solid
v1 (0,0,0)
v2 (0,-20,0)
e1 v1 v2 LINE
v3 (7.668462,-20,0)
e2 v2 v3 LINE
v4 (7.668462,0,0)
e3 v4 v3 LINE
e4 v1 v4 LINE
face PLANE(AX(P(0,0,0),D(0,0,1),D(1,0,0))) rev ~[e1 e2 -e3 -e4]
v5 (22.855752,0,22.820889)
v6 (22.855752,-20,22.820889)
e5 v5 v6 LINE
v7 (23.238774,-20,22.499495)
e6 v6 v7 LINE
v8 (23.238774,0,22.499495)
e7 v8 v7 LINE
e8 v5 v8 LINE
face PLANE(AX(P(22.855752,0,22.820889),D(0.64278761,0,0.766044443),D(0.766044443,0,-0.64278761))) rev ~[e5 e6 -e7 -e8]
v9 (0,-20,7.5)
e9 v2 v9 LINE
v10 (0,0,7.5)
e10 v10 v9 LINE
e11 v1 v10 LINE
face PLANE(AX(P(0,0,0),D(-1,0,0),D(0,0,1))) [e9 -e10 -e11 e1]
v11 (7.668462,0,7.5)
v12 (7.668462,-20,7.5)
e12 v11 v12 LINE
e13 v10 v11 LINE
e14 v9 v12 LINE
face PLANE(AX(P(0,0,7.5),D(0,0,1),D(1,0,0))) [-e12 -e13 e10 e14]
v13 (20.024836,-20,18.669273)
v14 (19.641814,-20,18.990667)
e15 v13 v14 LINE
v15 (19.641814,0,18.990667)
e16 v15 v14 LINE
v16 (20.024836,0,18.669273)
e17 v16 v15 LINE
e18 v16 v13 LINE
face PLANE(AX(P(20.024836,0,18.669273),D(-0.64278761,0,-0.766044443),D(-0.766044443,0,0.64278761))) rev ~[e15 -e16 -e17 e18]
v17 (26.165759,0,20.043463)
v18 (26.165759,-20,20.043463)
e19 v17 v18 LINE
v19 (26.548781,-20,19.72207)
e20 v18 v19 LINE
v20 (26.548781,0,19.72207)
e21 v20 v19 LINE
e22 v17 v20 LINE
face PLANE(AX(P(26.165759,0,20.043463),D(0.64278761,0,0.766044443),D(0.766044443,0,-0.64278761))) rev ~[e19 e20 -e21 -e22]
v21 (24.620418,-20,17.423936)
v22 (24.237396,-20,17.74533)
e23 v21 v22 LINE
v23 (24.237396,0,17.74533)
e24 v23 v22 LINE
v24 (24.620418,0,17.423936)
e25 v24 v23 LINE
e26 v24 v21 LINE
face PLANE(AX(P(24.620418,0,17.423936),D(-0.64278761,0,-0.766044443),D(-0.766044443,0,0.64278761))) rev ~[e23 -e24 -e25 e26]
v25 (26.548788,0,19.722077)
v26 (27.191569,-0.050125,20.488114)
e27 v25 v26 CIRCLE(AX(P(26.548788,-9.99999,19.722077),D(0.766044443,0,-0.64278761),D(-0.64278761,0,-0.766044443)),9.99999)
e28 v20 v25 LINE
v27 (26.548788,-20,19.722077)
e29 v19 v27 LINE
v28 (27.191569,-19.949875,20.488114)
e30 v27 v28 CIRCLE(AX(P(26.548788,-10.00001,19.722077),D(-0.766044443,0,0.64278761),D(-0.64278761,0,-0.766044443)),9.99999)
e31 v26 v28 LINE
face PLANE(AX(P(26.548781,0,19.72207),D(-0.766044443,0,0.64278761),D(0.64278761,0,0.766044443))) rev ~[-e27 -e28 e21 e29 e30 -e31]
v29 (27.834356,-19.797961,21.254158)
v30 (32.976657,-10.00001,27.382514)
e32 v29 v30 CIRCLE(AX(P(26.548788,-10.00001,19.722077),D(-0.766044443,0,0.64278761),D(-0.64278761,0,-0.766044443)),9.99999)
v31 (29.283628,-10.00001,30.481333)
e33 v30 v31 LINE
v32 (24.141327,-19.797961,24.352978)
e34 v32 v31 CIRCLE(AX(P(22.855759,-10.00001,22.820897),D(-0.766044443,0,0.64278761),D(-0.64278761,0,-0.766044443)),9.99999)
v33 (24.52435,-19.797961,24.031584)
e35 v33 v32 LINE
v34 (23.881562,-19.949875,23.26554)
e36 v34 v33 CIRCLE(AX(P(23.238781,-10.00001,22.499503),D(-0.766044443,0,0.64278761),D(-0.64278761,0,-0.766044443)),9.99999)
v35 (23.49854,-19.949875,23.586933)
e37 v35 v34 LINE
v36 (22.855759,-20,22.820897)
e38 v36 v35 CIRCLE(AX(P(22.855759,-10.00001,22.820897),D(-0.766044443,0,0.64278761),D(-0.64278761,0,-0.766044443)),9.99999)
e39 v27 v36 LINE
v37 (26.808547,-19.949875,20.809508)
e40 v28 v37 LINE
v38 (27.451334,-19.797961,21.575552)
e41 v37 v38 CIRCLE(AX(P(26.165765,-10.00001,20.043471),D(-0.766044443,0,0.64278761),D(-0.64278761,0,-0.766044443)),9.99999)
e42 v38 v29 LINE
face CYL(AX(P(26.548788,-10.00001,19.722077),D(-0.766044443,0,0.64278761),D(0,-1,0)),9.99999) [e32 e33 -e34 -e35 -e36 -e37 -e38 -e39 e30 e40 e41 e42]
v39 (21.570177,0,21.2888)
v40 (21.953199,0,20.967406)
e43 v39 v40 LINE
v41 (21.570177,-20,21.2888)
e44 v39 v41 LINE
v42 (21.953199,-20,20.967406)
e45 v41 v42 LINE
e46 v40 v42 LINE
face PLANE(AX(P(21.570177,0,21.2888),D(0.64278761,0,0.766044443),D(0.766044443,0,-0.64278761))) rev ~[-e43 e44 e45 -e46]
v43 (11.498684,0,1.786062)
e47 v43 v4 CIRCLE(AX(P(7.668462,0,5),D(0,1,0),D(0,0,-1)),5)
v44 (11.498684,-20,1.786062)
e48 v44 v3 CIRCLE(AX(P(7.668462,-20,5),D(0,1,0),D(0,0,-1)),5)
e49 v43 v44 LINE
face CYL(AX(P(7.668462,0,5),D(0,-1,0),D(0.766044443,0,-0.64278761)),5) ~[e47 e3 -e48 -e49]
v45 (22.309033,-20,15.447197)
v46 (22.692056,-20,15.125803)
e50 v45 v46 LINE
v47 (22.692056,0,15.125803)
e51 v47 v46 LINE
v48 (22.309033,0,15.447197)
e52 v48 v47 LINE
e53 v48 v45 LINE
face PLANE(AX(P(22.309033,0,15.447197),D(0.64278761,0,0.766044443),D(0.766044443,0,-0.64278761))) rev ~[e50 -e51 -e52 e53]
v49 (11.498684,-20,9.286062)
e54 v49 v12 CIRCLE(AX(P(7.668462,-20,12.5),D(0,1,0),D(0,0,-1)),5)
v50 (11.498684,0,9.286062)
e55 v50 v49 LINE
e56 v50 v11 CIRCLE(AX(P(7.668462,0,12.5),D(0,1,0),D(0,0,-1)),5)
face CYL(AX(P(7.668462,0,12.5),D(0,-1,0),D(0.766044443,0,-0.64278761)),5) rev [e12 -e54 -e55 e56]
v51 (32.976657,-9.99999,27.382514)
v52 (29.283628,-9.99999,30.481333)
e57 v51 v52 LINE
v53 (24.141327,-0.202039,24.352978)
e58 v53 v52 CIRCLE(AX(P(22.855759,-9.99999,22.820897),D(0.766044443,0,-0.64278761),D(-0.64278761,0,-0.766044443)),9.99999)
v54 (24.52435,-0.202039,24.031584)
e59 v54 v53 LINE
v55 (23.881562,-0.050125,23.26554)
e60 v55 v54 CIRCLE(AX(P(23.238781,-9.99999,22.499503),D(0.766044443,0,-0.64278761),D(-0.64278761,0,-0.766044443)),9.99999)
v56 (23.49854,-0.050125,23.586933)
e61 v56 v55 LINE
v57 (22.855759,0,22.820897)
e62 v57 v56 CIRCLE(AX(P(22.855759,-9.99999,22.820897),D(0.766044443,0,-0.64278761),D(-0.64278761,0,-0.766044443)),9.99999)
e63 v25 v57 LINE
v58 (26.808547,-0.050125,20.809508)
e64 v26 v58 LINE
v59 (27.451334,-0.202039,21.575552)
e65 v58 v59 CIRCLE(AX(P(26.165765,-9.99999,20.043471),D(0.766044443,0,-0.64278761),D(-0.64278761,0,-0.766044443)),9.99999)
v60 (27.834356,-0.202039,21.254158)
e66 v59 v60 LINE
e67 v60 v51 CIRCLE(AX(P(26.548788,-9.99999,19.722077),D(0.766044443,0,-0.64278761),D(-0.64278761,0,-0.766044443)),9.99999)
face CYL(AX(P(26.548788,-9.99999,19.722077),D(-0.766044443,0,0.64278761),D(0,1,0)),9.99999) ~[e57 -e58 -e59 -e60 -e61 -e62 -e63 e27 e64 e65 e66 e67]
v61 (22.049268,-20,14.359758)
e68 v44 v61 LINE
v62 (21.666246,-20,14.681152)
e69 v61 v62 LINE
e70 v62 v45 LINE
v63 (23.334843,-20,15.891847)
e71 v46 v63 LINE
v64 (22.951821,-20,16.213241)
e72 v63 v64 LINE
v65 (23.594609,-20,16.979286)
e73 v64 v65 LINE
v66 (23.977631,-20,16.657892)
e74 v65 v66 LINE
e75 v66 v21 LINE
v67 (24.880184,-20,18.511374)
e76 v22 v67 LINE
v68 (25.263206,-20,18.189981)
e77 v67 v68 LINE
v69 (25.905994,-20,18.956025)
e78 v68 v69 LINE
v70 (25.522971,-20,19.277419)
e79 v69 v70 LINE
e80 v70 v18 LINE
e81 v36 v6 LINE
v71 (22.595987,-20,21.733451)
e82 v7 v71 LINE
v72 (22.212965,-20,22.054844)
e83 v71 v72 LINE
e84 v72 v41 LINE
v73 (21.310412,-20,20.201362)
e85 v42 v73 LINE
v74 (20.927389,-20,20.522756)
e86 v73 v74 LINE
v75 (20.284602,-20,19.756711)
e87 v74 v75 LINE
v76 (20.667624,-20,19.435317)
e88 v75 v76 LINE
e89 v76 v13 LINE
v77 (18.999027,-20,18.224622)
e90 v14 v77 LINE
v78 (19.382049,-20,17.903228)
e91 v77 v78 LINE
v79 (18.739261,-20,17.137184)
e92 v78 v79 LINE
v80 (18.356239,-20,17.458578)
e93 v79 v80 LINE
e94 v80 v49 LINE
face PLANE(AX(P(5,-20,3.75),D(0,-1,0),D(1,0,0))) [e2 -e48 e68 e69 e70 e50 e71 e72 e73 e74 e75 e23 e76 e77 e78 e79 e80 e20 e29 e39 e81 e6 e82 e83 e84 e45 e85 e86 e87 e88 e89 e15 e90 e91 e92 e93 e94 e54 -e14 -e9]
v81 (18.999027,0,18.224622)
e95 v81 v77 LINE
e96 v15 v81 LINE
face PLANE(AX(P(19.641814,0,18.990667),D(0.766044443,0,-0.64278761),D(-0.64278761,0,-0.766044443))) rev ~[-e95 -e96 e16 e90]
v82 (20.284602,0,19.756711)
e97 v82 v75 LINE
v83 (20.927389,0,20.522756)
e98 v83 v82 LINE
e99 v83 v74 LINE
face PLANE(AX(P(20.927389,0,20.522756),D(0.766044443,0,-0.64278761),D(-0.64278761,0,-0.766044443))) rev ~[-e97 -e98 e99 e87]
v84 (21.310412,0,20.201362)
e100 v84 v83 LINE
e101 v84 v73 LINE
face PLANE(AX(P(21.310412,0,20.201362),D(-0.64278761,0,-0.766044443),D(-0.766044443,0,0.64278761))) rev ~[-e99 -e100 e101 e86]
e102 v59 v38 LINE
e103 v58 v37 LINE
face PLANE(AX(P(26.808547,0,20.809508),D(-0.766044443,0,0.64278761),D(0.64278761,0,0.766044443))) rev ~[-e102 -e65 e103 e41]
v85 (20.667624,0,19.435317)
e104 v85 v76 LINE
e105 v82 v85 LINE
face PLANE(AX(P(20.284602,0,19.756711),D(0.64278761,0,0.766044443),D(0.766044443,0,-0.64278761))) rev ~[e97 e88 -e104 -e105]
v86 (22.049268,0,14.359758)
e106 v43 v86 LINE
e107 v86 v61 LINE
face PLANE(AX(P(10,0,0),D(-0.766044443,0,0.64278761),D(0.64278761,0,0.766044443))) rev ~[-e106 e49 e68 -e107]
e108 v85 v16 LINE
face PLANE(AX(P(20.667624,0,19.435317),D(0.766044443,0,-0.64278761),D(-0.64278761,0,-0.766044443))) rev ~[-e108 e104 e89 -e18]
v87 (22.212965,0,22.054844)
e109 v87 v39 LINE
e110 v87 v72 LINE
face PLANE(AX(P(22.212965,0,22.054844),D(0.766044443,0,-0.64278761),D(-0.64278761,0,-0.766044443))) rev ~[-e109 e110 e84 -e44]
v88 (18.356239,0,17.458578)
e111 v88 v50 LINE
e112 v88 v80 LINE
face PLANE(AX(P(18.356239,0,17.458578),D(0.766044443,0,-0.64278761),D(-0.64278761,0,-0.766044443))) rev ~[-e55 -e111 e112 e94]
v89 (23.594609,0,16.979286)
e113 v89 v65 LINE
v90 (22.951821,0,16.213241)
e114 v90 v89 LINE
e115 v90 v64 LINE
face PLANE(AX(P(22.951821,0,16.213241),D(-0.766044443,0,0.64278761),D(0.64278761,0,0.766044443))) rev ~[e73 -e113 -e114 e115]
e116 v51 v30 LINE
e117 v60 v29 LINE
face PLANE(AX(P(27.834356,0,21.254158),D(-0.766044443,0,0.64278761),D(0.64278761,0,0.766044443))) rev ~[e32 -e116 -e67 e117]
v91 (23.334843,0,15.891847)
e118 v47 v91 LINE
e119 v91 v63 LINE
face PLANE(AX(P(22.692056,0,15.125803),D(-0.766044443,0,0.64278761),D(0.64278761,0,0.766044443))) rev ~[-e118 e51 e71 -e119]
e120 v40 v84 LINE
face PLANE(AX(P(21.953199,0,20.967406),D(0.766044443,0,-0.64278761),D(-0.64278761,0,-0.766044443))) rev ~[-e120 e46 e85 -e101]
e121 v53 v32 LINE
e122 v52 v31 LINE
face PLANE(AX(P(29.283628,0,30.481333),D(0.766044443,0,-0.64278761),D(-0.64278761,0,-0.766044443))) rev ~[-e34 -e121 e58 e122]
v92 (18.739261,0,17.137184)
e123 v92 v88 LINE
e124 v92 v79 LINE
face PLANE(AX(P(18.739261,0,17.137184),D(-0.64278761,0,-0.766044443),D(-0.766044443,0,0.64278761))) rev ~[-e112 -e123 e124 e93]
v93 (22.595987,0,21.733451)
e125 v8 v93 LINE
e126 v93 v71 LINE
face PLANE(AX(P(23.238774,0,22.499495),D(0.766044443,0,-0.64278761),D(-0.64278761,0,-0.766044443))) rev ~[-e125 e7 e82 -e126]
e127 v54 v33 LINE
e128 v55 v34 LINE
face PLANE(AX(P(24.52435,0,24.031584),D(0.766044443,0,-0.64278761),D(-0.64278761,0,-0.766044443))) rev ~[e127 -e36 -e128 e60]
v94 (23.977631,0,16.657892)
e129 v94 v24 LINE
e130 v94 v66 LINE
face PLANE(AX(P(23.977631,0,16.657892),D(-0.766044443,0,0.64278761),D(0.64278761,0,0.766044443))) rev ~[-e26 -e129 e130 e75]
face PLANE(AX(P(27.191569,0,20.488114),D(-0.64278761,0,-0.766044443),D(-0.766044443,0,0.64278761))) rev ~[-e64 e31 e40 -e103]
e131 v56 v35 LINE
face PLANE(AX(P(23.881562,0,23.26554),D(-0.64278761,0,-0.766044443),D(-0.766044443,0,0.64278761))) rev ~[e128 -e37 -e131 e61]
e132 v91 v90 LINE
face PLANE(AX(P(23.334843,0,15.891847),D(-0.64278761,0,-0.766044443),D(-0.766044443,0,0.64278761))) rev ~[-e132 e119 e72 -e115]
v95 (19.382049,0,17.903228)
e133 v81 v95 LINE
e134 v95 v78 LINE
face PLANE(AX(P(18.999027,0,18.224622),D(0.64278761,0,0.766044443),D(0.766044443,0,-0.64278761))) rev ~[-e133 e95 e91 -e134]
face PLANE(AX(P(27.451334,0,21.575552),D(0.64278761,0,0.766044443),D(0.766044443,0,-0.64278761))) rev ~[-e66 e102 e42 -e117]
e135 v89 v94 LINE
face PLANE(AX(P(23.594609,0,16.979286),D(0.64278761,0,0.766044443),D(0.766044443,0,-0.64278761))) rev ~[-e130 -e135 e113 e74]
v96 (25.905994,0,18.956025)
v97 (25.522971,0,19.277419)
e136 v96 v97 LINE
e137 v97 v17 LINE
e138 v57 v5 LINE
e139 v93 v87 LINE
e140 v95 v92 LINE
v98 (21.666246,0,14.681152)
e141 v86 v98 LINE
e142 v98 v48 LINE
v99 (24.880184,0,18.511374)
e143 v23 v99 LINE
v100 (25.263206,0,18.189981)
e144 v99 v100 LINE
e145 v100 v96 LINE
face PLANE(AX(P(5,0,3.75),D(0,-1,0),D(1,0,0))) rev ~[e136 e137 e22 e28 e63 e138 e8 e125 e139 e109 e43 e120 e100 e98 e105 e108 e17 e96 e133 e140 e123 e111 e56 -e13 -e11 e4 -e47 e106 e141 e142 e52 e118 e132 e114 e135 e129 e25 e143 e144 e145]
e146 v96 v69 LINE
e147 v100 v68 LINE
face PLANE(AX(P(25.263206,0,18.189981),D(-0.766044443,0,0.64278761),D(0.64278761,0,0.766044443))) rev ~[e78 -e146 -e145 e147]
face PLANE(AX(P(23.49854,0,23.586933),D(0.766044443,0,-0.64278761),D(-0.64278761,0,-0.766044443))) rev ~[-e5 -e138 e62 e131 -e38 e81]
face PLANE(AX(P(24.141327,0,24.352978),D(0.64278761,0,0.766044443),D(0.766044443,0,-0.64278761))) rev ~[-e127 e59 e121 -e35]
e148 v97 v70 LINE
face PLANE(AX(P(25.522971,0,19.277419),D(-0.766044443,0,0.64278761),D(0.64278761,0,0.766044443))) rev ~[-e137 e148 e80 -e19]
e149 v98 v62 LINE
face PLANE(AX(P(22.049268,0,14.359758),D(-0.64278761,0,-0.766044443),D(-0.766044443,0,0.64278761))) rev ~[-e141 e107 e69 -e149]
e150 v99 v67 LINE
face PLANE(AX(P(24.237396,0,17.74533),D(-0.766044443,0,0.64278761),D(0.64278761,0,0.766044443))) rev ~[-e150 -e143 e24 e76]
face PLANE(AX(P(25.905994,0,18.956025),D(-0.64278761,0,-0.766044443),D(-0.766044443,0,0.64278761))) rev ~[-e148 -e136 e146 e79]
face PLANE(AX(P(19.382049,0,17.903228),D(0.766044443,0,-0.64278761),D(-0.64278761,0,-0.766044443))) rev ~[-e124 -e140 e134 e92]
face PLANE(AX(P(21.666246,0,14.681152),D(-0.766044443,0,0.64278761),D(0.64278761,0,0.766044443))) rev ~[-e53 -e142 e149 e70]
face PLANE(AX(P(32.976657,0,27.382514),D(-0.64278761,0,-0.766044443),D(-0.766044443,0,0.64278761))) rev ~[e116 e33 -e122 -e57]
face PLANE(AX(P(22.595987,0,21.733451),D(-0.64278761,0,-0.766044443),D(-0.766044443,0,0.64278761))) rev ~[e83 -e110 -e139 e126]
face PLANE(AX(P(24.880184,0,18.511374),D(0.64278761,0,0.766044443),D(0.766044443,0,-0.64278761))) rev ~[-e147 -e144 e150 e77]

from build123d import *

# Parameters (mm, degrees)
F0_W     = 10
F0_H     = 7.5
F1_DEPTH = 20
F2_R     = 5
F3_R     = 9.99999
F4_R     = 5


# Not quite as in the source:
# - a fillet or chamfer is up to 0.001 mm smaller than in the source, because OpenCascade refuses the exact size


with BuildPart() as f1:
    # F0 (on Front) → F1 (new body)
    with BuildSketch(Plane.XZ):
        with Locations((5, 3.75)):
            Rectangle(F0_W, F0_H)
        Polygon((10, 7.5), (10, 0), (22.0492679997, 14.3597584268), (21.6662457782, 14.6811522316), (22.3090333878, 15.4471966748), (22.6920556094, 15.1258028699), (23.3348432191, 15.891847313), (22.9518209975, 16.2132411179), (23.5946086072, 16.979285561), (23.9776308288, 16.6578917562), (24.6204184385, 17.4239361993), (24.2373962169, 17.7453300041), (24.8801838266, 18.5113744472), (25.2632060482, 18.1899806424), (25.9059936578, 18.9560250855), (25.5229714363, 19.2774188904), (26.165759046, 20.0434633335), (26.5487812675, 19.7220695286), (27.1915688772, 20.4881139717), (26.8085466557, 20.8095077766), (27.4513342653, 21.5755522197), (27.8343564869, 21.2541584149), (32.9766573644, 27.3825139598), (29.2836282906, 30.4813332936), (24.1413274131, 24.3529777486), (24.5243496347, 24.0315839438), (23.881562025, 23.2655395007), (23.4985398034, 23.5869333055), (22.8557521937, 22.8208888624), (23.2387744153, 22.4994950575), (22.5959868056, 21.7334506144), (22.212964584, 22.0548444193), (21.5701769744, 21.2887999761), (21.9531991959, 20.9674061713), (21.3104115862, 20.2013617282), (20.9273893647, 20.522755533), (20.284601755, 19.7567110899), (20.6676239765, 19.4353172851), (20.0248363669, 18.6692728419), (19.6418141453, 18.9906666468), (18.9990265356, 18.2246222037), (19.3820487572, 17.9032283988), (18.7392611475, 17.1371839557), (18.3562389259, 17.4585777605), align=None)
    extrude(amount=F1_DEPTH)

    # F2
    f2_edges = [f1.edges().sort_by_distance(p)[0] for p in [
        (10, -10, 7.5),
    ]]
    fillet(f2_edges, radius=F2_R)

    # F3 (radius 10 in the source; OpenCascade refuses exactly that, so slightly less here)
    f3_edges = [f1.edges().sort_by_distance(p)[0] for p in [
        (31.130143, -20, 28.931924),
        (31.130143, 0, 28.931924),
    ]]
    fillet(f3_edges, radius=F3_R)

    # F4
    f4_edges = [f1.edges().sort_by_distance(p)[0] for p in [
        (10, -10, 0),
    ]]
    fillet(f4_edges, radius=F4_R)


solid = f1.part
